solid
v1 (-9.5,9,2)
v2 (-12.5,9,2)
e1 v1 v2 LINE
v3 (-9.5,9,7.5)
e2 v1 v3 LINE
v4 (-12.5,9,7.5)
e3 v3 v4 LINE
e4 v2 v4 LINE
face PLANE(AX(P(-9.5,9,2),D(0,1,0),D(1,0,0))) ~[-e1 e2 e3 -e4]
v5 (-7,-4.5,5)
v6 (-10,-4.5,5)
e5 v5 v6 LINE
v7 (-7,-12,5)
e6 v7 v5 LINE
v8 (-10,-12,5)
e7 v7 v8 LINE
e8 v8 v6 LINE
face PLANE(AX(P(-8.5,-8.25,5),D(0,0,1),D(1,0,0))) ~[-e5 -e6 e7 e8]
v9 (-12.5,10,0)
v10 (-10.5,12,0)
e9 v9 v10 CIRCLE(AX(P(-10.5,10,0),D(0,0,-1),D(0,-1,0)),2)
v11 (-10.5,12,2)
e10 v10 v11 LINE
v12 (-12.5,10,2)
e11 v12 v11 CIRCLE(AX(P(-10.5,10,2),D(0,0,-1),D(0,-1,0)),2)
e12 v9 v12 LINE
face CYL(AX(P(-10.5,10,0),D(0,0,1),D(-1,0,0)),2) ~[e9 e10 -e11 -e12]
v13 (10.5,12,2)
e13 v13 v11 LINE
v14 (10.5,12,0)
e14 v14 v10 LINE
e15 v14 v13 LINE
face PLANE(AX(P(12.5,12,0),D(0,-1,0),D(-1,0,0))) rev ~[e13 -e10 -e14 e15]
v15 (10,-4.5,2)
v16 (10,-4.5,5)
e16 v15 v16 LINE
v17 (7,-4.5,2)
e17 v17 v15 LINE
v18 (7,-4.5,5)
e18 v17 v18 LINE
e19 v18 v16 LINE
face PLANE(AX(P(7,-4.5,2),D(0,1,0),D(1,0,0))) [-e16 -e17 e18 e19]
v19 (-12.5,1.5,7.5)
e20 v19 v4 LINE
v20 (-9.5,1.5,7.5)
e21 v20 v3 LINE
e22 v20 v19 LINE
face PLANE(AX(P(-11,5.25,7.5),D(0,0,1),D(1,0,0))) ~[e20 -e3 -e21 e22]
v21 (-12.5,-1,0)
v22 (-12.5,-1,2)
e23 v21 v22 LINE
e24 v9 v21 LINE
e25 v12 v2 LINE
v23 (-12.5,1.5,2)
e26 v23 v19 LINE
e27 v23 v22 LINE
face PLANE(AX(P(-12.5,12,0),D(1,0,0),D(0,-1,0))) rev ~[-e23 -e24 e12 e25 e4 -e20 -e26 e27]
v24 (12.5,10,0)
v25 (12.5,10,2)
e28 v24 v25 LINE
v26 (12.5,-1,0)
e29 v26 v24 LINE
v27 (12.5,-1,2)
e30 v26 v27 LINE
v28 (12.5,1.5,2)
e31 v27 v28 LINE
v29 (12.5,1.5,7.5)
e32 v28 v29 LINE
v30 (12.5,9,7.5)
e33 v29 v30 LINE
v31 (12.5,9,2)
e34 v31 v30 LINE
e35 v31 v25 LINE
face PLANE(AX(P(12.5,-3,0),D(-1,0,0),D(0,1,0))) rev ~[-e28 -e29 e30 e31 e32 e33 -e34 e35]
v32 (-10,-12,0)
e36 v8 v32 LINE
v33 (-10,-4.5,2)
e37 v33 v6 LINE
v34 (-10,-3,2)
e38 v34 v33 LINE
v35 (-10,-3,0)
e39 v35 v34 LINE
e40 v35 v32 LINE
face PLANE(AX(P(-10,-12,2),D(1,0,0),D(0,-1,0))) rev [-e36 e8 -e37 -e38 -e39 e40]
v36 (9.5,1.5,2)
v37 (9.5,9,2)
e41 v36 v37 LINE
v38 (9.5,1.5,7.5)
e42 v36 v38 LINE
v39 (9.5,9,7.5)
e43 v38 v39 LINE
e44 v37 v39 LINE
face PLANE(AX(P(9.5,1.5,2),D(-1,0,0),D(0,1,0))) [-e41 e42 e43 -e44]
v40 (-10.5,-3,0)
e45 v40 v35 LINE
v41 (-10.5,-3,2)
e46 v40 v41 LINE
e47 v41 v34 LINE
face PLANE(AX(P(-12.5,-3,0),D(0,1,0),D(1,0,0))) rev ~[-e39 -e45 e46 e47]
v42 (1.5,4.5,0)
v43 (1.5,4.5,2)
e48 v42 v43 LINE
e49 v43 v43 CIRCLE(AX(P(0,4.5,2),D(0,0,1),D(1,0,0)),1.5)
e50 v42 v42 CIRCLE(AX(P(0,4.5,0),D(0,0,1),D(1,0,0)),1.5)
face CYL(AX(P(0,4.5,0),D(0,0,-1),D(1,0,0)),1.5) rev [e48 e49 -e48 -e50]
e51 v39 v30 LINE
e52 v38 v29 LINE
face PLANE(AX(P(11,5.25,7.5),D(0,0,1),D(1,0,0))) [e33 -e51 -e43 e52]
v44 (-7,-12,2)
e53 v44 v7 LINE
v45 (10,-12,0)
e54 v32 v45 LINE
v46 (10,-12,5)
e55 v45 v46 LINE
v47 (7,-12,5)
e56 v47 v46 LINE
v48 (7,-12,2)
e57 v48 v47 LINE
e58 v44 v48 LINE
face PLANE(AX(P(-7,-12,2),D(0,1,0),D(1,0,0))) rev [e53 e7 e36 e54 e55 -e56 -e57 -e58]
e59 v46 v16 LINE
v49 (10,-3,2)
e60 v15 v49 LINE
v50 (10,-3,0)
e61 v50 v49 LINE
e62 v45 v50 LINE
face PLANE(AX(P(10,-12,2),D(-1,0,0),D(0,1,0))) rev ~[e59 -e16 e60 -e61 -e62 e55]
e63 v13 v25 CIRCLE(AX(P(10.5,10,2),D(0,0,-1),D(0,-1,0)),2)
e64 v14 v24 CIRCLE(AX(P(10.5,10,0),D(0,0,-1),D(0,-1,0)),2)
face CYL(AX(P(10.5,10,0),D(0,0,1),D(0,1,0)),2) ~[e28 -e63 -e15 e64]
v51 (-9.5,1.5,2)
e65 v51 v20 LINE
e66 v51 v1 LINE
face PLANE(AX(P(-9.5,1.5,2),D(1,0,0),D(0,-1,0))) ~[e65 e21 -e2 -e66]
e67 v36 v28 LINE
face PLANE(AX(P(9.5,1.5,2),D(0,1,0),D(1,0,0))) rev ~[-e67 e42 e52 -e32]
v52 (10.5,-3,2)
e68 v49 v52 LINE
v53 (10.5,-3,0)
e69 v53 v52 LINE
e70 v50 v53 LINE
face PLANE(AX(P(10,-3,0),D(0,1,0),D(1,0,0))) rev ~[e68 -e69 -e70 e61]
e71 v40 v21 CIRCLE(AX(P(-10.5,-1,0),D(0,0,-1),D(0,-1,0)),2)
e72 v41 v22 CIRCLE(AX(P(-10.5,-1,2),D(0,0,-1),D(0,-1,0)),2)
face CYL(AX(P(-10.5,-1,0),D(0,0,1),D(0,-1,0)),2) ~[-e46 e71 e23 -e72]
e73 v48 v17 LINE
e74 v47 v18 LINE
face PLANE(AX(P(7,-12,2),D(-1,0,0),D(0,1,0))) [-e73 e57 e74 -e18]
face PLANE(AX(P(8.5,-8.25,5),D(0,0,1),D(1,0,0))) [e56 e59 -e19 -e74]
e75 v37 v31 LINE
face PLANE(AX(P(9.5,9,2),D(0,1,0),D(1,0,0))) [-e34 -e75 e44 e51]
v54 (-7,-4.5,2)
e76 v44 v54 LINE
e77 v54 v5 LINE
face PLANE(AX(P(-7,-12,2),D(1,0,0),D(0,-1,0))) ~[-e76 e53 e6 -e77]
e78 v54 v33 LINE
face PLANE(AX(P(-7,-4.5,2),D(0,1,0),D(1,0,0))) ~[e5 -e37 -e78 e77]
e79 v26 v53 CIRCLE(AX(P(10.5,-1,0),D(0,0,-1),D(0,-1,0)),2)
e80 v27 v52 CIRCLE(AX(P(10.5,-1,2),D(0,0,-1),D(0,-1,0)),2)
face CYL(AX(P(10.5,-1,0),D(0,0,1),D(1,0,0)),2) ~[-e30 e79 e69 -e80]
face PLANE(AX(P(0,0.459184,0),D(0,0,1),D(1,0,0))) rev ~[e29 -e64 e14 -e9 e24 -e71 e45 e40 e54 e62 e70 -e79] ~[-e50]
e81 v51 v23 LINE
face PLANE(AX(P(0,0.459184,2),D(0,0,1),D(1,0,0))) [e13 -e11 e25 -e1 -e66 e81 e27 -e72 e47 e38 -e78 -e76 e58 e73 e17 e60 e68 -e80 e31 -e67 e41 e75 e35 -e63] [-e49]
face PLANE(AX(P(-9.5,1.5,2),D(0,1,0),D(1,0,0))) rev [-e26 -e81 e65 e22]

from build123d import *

# Parameters (mm, degrees)
F0_R     = 1.5
F1_DEPTH = 2
F2_W     = 3
F2_H     = 7.5
F3_DEPTH = 3
F4_DEPTH = 5.5
F5_R     = 2


# Not quite as in the source:
# - a pattern or mirror of a feature is missing from the dataset's text; its kind, count and spacing are read off the source's solid


with BuildPart() as f1:
    # F0 (on Top) → F1 (new body)
    with BuildSketch(Plane.XY):
        Polygon((12.5, 12), (0, 12), (-12.5, 12), (-12.5, -3), (-10, -3), (-10, -12), (0, -12), (10, -12), (10, -3), (12.5, -3), align=None)
        with Locations((0, 4.5)):
            Circle(F0_R, mode=Mode.SUBTRACT)
    extrude(amount=F1_DEPTH)

    # F2 (on face) → F3 (join)
    with BuildSketch(Plane.XY.offset(2)):
        with Locations((8.5, -8.25)):
            Rectangle(F2_W, F2_H)
    f3 = extrude(amount=F3_DEPTH)

    # F3_copies: F3 across plane
    add(f3.mirror(Plane(origin=(0, 0, 0), x_dir=(0, 0, -1), z_dir=(-1, 0, 0))))

    # F2 (on face) → F4 (join)
    with BuildSketch(Plane.XY.offset(2)):
        with Locations((11, 5.25)):
            Rectangle(F2_W, F2_H)
    f4 = extrude(amount=F4_DEPTH)

    # F4_copies: F4 across plane
    add(f4.mirror(Plane(origin=(0, 0, 0), x_dir=(0, 0, -1), z_dir=(-1, 0, 0))))

    # F5
    f5_edges = [f1.edges().sort_by_distance(p)[0] for p in [
        (12.5, 12, 1),
        (12.5, -3, 1),
        (-12.5, -3, 1),
        (-12.5, 12, 1),
    ]]
    fillet(f5_edges, radius=F5_R)


solid = f1.part
